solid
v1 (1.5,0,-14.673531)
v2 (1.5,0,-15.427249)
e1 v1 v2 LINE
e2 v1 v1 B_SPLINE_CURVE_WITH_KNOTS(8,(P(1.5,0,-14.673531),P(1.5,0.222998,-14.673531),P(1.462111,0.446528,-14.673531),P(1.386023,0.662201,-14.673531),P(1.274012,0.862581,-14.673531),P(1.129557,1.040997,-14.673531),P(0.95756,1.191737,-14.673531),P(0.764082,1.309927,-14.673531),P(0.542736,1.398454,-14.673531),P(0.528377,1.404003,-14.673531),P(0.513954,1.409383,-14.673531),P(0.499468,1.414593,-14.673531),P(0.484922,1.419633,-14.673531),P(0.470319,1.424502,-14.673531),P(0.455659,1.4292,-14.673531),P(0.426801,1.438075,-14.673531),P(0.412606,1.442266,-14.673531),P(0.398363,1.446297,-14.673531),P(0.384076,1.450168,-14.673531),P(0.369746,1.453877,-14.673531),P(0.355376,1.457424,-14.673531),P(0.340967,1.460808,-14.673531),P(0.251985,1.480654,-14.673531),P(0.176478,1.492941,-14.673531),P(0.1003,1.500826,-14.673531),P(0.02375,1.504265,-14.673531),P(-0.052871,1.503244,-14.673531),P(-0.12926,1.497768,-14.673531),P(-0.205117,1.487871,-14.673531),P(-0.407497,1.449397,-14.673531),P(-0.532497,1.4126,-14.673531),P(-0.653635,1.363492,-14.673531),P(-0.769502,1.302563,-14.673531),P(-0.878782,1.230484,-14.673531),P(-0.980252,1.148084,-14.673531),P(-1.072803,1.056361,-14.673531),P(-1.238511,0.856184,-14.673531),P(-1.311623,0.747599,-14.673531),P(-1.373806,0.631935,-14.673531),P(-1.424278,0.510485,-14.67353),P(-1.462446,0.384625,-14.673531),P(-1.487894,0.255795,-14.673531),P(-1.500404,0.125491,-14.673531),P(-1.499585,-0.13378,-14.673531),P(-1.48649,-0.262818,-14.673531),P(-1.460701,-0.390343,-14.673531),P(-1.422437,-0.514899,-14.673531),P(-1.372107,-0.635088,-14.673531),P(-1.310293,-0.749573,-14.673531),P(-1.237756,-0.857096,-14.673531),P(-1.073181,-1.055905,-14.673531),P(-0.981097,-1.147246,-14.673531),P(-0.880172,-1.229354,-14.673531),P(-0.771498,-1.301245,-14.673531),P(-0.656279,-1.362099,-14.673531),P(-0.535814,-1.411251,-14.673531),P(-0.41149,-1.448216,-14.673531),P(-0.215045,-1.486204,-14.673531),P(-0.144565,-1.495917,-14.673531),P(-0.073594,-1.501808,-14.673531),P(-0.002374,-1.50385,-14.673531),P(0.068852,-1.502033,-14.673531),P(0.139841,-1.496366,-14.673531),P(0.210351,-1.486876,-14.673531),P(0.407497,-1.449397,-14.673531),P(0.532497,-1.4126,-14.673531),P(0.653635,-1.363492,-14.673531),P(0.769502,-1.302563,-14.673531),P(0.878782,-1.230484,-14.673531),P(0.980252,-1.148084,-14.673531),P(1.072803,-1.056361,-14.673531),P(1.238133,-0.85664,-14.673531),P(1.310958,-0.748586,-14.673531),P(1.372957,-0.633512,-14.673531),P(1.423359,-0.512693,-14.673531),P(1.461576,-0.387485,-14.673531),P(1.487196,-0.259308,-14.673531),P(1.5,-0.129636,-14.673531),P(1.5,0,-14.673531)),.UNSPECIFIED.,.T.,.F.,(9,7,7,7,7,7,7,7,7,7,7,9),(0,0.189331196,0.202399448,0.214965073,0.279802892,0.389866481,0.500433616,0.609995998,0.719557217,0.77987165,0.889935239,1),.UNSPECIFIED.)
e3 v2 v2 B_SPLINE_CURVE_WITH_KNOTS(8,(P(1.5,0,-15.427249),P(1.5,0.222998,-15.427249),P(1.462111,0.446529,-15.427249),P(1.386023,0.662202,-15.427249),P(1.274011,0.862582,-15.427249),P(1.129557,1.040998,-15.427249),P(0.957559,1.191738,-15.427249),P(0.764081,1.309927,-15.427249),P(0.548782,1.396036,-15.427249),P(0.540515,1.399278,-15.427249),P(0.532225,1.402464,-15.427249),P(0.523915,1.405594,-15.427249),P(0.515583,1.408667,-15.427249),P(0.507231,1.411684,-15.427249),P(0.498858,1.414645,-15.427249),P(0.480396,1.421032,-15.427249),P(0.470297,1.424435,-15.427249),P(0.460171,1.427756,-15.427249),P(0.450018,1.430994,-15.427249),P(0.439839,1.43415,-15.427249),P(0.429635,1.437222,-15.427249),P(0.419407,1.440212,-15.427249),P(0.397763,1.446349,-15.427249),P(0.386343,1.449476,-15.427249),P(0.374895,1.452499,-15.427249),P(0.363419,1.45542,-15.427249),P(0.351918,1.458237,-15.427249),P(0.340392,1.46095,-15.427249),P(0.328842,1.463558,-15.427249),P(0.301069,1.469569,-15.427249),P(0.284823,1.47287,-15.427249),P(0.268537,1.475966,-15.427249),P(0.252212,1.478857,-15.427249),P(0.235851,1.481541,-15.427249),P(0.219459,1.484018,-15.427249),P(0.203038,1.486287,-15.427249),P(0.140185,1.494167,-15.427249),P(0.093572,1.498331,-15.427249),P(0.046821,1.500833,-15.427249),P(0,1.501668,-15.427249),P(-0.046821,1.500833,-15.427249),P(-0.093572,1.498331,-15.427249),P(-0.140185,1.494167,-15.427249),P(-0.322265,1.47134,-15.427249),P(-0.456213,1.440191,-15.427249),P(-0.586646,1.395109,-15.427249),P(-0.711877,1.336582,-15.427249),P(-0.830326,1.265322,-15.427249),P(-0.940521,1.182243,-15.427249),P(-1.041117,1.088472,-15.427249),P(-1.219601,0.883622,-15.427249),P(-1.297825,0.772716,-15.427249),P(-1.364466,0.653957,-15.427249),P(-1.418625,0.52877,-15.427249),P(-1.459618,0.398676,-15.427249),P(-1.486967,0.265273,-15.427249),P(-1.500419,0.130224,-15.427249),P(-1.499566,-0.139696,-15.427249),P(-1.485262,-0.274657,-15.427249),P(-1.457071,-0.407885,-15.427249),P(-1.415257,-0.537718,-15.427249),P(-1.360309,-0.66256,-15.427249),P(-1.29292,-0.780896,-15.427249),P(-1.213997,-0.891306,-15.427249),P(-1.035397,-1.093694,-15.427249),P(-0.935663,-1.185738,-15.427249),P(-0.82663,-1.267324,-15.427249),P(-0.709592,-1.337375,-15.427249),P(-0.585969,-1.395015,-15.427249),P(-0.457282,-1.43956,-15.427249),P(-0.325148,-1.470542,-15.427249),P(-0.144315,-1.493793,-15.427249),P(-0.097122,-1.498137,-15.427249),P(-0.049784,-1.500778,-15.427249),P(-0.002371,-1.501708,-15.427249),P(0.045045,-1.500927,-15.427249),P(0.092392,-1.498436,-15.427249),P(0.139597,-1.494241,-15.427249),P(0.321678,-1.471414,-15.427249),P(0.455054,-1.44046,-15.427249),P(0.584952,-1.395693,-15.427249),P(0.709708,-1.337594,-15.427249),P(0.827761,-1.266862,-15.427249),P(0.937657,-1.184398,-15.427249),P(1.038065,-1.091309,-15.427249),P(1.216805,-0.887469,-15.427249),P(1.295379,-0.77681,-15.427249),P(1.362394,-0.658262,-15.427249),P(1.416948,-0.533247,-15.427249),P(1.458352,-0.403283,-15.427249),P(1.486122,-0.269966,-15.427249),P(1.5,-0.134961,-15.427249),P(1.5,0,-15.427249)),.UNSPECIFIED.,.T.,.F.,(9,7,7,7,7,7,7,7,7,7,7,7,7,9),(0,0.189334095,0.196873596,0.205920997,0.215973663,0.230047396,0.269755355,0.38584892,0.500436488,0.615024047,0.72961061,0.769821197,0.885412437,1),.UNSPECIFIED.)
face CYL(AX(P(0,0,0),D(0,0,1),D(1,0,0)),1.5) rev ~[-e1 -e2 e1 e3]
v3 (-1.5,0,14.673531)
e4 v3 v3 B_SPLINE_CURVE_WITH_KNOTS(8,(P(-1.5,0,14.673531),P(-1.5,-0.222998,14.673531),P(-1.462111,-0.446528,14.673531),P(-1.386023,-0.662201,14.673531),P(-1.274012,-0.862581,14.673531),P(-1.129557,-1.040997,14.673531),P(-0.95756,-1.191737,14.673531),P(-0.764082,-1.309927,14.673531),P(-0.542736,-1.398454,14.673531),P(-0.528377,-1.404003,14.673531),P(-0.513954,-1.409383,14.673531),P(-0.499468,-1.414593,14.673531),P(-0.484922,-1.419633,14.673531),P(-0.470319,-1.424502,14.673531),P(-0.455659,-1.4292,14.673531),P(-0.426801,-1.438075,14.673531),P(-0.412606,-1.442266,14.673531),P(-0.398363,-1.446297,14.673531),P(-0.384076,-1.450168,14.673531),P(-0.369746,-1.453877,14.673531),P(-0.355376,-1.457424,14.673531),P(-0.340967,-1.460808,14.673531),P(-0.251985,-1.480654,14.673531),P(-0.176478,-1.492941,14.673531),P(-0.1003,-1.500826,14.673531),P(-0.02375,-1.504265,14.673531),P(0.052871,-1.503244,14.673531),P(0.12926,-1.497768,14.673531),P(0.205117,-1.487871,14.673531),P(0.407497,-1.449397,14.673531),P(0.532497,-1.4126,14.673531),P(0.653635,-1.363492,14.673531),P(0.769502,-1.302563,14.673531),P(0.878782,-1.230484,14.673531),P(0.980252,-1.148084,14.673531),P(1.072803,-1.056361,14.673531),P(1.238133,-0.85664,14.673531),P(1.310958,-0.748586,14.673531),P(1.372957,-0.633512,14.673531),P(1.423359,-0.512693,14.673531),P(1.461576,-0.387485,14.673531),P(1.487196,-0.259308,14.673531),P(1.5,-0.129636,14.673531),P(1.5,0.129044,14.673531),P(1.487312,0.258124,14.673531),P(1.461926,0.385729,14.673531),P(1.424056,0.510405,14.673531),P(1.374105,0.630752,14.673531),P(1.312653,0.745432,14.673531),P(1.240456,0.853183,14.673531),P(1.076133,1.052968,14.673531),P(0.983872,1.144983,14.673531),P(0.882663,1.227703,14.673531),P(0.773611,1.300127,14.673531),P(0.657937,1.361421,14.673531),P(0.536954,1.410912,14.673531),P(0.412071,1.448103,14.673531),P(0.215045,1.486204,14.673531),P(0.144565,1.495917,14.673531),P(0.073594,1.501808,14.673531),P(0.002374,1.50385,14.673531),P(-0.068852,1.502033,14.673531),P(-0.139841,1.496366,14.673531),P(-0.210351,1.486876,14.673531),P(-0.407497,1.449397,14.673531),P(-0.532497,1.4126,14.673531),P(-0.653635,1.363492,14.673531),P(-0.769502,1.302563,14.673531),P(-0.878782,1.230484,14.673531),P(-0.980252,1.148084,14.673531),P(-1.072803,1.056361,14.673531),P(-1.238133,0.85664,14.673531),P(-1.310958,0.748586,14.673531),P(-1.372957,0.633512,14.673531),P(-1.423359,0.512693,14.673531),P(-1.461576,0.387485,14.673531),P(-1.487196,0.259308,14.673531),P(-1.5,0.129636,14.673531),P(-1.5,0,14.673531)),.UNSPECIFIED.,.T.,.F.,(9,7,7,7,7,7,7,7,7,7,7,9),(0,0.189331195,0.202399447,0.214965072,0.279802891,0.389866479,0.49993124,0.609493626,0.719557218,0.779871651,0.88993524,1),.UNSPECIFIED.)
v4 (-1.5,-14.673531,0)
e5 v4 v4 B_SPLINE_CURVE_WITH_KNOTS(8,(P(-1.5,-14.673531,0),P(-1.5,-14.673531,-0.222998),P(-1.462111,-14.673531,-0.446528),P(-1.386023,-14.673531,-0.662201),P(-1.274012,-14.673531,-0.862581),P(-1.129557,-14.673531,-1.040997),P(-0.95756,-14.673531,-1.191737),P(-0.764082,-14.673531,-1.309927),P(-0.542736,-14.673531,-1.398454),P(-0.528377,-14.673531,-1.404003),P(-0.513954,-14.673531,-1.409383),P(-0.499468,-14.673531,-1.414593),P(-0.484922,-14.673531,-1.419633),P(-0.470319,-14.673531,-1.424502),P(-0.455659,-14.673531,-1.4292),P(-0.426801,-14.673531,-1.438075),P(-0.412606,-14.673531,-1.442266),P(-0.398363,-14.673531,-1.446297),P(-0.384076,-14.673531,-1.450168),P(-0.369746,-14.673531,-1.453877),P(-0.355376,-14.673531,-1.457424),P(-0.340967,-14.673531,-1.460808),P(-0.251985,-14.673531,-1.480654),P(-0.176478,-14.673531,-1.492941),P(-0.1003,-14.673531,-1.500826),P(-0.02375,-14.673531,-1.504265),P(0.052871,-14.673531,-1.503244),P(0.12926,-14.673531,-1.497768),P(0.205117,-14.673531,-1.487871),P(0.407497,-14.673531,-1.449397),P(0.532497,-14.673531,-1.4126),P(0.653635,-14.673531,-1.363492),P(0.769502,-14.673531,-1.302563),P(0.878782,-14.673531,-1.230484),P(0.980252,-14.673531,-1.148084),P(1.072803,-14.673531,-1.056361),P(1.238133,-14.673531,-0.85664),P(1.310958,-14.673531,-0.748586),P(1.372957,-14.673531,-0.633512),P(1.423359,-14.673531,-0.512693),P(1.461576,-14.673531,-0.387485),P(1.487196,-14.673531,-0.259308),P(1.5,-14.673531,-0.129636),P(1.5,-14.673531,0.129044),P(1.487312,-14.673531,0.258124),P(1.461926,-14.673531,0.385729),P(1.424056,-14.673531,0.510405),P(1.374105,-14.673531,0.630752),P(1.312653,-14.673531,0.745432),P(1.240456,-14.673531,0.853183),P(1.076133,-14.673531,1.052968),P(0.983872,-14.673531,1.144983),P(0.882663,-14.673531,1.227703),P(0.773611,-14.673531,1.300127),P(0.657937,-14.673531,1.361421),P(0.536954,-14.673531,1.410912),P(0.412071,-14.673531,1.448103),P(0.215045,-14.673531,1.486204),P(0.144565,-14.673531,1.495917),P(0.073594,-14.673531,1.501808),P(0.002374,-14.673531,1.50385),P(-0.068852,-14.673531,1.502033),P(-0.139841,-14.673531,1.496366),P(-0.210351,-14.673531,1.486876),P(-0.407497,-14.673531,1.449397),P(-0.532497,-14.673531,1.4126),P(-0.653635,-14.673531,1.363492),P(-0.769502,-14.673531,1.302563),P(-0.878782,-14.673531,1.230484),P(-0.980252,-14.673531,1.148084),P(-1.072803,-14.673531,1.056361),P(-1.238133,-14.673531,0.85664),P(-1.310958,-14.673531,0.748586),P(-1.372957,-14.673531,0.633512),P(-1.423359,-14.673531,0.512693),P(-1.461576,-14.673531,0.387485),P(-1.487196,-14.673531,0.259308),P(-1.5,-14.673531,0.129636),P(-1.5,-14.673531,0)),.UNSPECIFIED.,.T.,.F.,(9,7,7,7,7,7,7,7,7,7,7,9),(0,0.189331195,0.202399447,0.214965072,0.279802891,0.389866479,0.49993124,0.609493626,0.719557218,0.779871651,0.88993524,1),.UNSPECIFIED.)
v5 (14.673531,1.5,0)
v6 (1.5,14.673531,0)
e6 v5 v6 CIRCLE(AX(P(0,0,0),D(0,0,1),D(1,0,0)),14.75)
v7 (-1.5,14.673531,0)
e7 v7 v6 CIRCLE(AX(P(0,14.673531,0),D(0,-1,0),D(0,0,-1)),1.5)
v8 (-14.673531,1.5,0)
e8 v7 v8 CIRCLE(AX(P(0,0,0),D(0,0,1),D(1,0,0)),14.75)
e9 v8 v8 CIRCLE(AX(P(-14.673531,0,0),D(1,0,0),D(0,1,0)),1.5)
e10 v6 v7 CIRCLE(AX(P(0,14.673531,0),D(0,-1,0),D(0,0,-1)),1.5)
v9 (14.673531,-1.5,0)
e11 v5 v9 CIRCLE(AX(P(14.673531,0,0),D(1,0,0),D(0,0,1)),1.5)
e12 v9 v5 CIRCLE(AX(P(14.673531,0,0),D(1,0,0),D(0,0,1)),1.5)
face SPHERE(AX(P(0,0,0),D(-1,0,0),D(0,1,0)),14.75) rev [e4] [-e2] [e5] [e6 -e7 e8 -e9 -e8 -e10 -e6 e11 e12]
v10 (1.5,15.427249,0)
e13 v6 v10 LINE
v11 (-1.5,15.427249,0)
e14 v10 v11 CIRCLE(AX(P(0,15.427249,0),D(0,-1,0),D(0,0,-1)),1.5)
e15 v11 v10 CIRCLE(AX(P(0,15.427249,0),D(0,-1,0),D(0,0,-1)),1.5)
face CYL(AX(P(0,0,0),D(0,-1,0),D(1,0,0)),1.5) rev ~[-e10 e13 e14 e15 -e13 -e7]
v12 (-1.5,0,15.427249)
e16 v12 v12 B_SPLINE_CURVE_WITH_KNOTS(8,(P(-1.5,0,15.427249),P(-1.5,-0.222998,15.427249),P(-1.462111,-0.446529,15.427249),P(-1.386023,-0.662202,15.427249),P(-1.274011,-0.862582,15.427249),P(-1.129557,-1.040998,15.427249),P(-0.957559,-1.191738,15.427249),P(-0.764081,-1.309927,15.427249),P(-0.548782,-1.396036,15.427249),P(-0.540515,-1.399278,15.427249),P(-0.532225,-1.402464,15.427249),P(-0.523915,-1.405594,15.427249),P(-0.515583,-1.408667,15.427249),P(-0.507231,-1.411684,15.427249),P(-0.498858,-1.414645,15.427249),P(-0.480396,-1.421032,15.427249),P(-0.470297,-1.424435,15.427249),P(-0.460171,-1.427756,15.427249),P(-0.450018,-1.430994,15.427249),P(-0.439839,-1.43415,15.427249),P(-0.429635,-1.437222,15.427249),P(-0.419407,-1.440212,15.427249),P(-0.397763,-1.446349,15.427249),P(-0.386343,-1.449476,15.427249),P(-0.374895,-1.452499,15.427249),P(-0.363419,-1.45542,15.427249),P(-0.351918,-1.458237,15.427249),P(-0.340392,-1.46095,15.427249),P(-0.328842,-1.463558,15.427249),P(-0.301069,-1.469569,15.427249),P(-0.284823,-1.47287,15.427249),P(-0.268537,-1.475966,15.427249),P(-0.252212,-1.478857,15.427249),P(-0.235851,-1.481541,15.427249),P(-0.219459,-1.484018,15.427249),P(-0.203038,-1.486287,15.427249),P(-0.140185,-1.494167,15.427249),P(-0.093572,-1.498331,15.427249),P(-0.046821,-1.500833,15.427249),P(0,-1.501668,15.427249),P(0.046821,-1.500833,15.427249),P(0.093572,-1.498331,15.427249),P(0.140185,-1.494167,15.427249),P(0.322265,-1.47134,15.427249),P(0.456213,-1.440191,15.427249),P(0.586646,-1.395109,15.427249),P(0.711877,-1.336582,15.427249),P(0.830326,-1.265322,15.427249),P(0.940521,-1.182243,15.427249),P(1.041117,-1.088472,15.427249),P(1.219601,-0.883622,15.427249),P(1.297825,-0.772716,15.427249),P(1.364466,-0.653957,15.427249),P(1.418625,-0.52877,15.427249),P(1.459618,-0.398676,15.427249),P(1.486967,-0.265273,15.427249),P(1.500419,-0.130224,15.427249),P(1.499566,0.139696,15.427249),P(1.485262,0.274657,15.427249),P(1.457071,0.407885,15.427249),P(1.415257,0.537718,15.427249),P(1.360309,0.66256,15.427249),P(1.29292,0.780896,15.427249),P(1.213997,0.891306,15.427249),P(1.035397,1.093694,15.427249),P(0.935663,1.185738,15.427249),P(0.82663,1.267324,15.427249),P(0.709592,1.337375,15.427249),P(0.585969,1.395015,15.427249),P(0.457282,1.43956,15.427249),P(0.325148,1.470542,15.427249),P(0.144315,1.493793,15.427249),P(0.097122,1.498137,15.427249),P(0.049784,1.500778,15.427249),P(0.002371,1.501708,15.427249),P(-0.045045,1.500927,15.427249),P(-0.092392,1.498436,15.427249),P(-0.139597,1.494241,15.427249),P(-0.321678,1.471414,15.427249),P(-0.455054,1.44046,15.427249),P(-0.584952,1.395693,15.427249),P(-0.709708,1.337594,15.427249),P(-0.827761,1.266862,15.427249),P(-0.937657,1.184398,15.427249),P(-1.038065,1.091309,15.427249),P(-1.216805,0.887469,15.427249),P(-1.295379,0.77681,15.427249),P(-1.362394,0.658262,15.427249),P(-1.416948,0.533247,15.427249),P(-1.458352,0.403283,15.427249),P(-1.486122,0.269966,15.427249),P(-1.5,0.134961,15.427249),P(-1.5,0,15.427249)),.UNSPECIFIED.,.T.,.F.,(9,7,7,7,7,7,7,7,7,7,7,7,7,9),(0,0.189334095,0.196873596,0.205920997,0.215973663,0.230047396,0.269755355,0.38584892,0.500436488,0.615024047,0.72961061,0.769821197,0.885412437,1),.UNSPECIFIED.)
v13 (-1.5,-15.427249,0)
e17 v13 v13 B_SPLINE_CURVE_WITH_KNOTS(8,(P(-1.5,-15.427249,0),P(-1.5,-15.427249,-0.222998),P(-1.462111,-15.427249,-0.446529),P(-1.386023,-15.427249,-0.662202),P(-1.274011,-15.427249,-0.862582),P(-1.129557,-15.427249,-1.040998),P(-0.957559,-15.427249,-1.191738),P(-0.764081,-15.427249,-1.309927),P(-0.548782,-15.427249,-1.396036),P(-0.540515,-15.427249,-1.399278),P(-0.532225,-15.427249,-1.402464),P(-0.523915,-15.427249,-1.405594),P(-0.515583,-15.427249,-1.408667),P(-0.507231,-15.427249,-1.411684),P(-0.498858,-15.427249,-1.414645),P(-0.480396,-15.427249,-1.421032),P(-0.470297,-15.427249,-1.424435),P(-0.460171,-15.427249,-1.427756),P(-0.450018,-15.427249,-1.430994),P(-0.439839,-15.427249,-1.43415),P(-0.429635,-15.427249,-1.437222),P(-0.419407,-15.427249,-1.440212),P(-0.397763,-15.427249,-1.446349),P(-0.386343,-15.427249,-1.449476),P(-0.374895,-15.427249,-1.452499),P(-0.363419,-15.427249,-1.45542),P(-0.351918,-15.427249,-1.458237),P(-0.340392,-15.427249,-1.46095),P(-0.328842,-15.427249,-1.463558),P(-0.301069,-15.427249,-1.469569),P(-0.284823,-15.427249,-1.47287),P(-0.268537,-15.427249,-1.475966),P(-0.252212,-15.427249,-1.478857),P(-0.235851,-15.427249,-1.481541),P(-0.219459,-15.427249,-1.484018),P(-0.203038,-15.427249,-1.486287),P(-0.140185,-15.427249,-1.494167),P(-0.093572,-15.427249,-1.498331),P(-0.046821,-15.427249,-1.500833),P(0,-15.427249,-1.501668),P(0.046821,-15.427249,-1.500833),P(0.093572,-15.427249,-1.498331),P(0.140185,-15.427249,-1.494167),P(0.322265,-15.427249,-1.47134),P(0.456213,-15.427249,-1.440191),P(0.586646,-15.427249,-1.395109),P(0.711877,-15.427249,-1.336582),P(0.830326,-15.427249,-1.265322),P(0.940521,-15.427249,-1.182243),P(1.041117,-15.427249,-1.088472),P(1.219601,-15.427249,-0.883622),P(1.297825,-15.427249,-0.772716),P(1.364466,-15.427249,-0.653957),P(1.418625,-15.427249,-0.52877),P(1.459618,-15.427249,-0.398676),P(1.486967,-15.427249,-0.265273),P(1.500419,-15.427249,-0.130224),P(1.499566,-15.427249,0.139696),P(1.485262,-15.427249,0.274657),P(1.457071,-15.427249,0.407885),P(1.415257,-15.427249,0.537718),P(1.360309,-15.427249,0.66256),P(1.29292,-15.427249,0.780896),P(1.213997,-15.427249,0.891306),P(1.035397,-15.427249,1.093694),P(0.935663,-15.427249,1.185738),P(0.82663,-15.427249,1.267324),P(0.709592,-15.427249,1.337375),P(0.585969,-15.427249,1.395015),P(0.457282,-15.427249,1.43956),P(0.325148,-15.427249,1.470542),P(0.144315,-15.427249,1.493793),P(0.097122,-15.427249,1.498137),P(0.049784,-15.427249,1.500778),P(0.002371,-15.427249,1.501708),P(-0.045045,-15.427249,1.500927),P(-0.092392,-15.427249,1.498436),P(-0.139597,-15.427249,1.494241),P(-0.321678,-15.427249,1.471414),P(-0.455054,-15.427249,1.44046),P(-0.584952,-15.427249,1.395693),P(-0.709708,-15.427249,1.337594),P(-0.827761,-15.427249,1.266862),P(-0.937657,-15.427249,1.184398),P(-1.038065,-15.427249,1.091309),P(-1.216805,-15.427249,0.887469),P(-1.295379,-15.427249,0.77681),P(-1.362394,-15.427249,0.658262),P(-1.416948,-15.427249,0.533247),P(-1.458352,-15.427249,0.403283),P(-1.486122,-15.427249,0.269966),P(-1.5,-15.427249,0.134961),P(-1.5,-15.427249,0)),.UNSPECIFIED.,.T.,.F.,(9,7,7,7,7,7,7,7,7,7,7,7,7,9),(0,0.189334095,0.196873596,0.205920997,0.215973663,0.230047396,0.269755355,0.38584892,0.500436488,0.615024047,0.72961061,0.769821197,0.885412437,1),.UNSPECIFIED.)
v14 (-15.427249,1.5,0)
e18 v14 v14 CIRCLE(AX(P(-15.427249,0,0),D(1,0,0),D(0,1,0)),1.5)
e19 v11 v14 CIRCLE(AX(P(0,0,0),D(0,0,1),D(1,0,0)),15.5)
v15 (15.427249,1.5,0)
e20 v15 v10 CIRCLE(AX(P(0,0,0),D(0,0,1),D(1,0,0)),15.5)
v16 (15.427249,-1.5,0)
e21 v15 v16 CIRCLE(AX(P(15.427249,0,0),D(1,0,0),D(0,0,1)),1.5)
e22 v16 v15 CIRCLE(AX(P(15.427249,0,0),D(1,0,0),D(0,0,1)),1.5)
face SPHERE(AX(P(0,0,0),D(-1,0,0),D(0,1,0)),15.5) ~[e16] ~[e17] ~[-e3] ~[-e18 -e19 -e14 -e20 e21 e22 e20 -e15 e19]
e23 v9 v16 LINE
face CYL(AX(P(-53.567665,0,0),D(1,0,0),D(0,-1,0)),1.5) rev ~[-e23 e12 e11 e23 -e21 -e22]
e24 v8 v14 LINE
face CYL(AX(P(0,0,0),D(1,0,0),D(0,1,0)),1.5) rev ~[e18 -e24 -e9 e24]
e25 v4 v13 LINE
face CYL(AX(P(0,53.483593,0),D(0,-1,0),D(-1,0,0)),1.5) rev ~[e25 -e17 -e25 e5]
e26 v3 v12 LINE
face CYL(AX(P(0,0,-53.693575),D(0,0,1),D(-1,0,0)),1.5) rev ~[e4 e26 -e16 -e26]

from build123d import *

# Parameters (mm, degrees)
F2_T      = -0.75
F4_D      = 3
F4_DEPTH  = 15.501
F6_D      = 3
F8_D      = 3
F8_DEPTH  = 15.501
F10_D     = 3
F12_D     = 3
F12_DEPTH = 15.501
F14_D     = 3


# Not quite as in the source:
# - a feature names something its author has since deleted; it is built from what else it names


with BuildPart() as f1:
    # F0 (on Top) → F1 (revolve)
    with BuildSketch(Plane.XY):
        with BuildLine():
            ThreePointArc((15.5, 0), (0, 15.5), (-15.5, 0))
            Line((-15.5, 0), (15.5, 0))
        make_face()
    revolve(axis=Axis((0.5901393228, 0, 0), (1, 0, 0)))

    # F2 (hollow: no face is removed)
    offset(amount=F2_T, mode=Mode.SUBTRACT)

    # F4 (through all, one way)
    with BuildSketch(Plane.XY):
        with Locations((0, 0)):
            Circle(F4_D / 2)
    extrude(amount=-F4_DEPTH, mode=Mode.SUBTRACT)

    # F6 (through all)
    with Locations(Plane(origin=(0, 0, 0), x_dir=(1, 0, 0), z_dir=(0, 0, -1))):
        with Locations((0, 0)):
            Hole(F6_D / 2)

    # F8 (through all, one way)
    with BuildSketch(Plane.YZ):
        with Locations((0, 0)):
            Circle(F8_D / 2)
    extrude(amount=-F8_DEPTH, mode=Mode.SUBTRACT)

    # F10 (through all)
    with Locations(Plane(origin=(0, 0, 0), x_dir=(0, 1, 0), z_dir=(-1, 0, 0))):
        with Locations((0, 0)):
            Hole(F10_D / 2)

    # F12 (through all, one way)
    with BuildSketch(Plane.XZ):
        with Locations((0, 0)):
            Circle(F12_D / 2)
    extrude(amount=-F12_DEPTH, mode=Mode.SUBTRACT)

    # F14 (through all)
    with Locations(Plane(origin=(0, 0, 0), x_dir=(1, 0, 0), z_dir=(0, 1, 0))):
        with Locations((0, 0)):
            Hole(F14_D / 2)


solid = f1.part
